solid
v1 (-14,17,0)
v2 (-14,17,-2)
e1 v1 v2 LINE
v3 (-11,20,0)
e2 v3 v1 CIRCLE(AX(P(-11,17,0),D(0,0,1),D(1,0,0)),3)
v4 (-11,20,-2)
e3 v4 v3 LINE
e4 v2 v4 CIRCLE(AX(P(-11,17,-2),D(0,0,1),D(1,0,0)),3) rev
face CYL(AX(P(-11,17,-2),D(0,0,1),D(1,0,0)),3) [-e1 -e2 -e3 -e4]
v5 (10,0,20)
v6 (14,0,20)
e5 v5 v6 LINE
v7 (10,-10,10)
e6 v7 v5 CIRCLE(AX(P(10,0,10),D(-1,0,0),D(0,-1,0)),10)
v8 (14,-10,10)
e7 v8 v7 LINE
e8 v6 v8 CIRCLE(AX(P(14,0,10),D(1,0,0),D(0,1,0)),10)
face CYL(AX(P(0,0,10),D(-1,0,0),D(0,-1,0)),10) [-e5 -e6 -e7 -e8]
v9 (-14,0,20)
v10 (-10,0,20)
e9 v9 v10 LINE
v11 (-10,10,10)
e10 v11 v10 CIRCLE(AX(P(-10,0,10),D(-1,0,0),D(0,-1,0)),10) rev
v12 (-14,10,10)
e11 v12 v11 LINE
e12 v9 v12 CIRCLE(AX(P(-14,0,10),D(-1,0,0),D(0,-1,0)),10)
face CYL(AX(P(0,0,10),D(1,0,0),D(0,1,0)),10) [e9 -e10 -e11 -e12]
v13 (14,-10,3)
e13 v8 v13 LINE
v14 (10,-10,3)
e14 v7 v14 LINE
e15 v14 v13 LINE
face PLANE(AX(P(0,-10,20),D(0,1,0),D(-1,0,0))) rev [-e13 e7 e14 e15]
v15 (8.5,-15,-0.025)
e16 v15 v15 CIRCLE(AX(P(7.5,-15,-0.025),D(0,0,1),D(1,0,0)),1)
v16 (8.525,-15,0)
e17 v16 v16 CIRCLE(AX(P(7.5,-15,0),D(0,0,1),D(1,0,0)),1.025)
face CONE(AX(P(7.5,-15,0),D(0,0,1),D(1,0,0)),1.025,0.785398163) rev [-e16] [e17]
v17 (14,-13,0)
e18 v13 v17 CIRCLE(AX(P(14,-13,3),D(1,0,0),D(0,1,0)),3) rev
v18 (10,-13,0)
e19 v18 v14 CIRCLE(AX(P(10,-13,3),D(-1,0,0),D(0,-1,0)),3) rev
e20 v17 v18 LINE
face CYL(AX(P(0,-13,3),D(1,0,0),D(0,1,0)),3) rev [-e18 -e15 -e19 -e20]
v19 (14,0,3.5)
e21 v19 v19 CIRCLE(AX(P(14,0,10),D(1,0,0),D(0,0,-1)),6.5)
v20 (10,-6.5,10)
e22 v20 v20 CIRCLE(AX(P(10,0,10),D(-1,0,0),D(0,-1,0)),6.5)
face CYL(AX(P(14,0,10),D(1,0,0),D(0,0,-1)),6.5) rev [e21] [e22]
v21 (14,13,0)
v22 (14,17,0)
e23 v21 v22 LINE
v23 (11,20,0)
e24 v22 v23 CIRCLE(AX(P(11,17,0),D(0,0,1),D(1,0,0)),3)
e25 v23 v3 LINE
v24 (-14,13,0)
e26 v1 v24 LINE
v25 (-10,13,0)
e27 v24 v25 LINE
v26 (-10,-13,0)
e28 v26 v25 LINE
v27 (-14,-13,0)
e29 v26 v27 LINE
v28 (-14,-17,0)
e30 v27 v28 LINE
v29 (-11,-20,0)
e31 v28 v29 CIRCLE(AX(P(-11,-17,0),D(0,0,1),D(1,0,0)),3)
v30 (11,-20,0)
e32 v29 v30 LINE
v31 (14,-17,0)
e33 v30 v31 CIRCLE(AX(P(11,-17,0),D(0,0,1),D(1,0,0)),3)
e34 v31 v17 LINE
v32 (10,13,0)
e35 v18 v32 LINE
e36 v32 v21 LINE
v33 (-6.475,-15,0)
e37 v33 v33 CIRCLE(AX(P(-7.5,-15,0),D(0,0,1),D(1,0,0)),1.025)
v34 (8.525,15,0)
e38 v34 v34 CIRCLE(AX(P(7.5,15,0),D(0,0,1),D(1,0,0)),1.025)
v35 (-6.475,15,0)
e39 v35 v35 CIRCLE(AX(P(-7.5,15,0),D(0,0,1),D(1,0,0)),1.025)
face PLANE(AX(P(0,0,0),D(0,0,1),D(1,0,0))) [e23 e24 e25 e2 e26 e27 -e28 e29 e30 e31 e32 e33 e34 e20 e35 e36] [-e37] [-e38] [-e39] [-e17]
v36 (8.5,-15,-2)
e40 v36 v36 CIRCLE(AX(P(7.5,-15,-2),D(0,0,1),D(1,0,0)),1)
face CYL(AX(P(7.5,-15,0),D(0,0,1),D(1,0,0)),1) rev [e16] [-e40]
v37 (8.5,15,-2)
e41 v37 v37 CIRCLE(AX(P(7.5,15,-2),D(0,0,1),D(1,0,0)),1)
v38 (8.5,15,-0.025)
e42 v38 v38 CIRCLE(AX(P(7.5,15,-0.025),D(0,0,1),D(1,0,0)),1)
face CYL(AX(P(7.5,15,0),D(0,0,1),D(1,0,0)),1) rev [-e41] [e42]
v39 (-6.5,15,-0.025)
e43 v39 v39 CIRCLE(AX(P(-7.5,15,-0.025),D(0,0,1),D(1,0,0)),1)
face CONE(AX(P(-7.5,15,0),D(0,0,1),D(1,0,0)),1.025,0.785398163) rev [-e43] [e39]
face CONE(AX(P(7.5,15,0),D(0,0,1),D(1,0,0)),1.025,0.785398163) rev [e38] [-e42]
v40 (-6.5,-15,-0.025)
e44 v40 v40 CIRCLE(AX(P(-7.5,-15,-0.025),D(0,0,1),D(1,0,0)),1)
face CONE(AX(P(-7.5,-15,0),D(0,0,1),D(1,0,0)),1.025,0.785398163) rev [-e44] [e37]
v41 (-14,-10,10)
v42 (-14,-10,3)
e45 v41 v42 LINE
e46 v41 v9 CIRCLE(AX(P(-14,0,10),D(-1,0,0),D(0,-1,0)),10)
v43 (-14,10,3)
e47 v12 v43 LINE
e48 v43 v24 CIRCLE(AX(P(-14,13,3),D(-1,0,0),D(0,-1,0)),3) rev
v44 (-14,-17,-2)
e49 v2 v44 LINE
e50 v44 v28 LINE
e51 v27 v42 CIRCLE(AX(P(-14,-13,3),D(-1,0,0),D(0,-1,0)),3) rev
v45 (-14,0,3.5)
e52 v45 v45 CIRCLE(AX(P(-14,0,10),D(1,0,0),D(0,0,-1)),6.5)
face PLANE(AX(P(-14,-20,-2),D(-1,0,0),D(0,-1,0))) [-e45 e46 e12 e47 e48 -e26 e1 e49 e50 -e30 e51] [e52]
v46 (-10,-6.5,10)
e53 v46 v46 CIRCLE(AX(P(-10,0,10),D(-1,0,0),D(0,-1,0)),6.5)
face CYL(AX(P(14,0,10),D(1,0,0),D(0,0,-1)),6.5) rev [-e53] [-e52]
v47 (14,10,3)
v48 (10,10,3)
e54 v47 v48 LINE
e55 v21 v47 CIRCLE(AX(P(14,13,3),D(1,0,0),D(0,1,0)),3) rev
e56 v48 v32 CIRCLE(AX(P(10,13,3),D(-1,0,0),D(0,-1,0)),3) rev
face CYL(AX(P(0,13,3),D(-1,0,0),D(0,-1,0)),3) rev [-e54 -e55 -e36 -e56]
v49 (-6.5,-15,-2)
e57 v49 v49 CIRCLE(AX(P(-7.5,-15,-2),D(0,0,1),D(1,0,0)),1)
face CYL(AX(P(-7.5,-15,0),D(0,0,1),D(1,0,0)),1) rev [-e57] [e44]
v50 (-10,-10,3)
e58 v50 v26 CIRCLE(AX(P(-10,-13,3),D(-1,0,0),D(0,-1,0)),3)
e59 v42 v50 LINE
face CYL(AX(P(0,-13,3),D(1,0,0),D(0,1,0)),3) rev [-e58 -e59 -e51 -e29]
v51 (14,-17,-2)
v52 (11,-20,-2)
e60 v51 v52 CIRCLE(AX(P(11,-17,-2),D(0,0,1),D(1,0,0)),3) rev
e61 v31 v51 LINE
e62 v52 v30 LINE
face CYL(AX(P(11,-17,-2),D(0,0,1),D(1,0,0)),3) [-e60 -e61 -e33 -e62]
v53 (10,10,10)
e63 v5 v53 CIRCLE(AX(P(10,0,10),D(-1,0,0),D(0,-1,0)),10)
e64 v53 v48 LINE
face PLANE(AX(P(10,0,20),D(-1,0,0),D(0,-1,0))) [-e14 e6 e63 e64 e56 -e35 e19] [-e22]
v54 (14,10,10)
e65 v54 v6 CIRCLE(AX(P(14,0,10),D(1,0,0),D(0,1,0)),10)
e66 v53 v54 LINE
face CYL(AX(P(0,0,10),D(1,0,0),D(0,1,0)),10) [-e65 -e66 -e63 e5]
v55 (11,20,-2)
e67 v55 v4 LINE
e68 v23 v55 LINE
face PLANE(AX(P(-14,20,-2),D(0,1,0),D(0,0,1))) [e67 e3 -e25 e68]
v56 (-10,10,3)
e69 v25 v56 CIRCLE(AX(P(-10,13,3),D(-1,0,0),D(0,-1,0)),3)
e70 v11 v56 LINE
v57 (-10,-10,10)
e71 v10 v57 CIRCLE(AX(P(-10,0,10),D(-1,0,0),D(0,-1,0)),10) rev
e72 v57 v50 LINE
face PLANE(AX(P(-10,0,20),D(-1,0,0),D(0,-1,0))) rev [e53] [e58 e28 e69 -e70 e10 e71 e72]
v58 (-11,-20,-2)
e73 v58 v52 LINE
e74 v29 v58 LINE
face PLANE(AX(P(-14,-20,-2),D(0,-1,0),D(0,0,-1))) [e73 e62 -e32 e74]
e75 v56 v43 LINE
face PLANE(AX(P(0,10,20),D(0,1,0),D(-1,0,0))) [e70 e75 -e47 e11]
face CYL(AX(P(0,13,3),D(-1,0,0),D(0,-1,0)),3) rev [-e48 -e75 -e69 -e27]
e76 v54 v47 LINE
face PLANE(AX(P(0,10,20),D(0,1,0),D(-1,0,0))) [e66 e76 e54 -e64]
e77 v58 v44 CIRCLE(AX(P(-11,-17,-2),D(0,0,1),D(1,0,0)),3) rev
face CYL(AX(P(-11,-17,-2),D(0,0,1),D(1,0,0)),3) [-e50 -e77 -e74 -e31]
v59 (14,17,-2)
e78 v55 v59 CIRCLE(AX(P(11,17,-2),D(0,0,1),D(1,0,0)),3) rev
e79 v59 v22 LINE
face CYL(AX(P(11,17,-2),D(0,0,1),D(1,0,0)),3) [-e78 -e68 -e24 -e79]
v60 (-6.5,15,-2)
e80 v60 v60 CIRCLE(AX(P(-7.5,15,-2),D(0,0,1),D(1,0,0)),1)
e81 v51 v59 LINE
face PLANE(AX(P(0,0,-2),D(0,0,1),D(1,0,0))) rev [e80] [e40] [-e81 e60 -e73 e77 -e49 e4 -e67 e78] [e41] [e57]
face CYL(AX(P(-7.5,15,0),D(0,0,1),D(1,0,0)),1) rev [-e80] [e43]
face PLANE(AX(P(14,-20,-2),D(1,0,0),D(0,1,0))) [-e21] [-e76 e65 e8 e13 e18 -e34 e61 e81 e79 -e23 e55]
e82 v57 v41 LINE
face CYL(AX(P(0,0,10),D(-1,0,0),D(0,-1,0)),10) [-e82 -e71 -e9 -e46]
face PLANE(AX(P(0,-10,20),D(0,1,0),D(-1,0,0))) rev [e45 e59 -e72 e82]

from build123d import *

# Parameters (mm, degrees)
SKETCH1_W                       = 40
SKETCH1_H                       = 28
BOSS_EXTRUDE1_DEPTH             = 2
SKETCH2_W                       = 20
SKETCH2_H                       = 4
BOSS_EXTRUDE2_DEPTH             = 20
FILLET1_R                       = 10
F_10_0MM_DOWEL_HOLE1_D          = 13
F_2_0MM_DOWEL_HOLE1_D           = 2
F_2_0MM_DOWEL_HOLE1_CSINK_D     = 2.05
F_2_0MM_DOWEL_HOLE1_CSINK_ANGLE = 90
FILLET2_R                       = 3


with BuildPart() as part:
    # Sketch1 → Boss-Extrude1 (new body)
    with BuildSketch(Plane(origin=(0, 0, 0), x_dir=(0, 1, 0), z_dir=(0, 0, 1))):
        Rectangle(SKETCH1_W, SKETCH1_H)
    extrude(amount=-BOSS_EXTRUDE1_DEPTH)

    # Sketch2 → Boss-Extrude2 (add)
    with BuildSketch(Plane(origin=(0, 0, 0), x_dir=(0, 1, 0), z_dir=(0, 0, 1))):
        with Locations((0, 12)):
            Rectangle(SKETCH2_W, SKETCH2_H)
        with Locations((0, -12)):
            Rectangle(SKETCH2_W, SKETCH2_H)
    extrude(amount=BOSS_EXTRUDE2_DEPTH)

    # Fillet1
    fillet1_edges = [part.edges().sort_by_distance(p)[0] for p in [
        (12, 10, 20),
        (12, -10, 20),
        (-12, 10, 20),
        (-12, -10, 20),
    ]]
    fillet(fillet1_edges, radius=FILLET1_R - 0.0001)  # a hair under: the kernel refuses the full size

    # Ø10.0mm Dowel Hole1 (through all)
    with Locations(Plane.YZ.offset(14)):
        with Locations((0, 10)):
            Hole(F_10_0MM_DOWEL_HOLE1_D / 2)

    # Ø2.0mm Dowel Hole1 (through all)
    with Locations(Plane(origin=(0, 0, 0), x_dir=(0, 1, 0), z_dir=(0, 0, 1))):
        with Locations((15, -7.5), (-15, 7.5), (-15, -7.5), (15, 7.5)):
            CounterSinkHole(F_2_0MM_DOWEL_HOLE1_D / 2, F_2_0MM_DOWEL_HOLE1_CSINK_D / 2, counter_sink_angle=F_2_0MM_DOWEL_HOLE1_CSINK_ANGLE)

    # Fillet2
    fillet2_edges = [part.edges().sort_by_distance(p)[0] for p in [
        (-12, -10, 0),
        (-12, 10, 0),
        (12, -10, 0),
        (12, 10, 0),
        (-14, -20, -1),
        (-14, 20, -1),
        (14, 20, -1),
        (14, -20, -1),
    ]]
    fillet(fillet2_edges, radius=FILLET2_R)


solid = part.part
